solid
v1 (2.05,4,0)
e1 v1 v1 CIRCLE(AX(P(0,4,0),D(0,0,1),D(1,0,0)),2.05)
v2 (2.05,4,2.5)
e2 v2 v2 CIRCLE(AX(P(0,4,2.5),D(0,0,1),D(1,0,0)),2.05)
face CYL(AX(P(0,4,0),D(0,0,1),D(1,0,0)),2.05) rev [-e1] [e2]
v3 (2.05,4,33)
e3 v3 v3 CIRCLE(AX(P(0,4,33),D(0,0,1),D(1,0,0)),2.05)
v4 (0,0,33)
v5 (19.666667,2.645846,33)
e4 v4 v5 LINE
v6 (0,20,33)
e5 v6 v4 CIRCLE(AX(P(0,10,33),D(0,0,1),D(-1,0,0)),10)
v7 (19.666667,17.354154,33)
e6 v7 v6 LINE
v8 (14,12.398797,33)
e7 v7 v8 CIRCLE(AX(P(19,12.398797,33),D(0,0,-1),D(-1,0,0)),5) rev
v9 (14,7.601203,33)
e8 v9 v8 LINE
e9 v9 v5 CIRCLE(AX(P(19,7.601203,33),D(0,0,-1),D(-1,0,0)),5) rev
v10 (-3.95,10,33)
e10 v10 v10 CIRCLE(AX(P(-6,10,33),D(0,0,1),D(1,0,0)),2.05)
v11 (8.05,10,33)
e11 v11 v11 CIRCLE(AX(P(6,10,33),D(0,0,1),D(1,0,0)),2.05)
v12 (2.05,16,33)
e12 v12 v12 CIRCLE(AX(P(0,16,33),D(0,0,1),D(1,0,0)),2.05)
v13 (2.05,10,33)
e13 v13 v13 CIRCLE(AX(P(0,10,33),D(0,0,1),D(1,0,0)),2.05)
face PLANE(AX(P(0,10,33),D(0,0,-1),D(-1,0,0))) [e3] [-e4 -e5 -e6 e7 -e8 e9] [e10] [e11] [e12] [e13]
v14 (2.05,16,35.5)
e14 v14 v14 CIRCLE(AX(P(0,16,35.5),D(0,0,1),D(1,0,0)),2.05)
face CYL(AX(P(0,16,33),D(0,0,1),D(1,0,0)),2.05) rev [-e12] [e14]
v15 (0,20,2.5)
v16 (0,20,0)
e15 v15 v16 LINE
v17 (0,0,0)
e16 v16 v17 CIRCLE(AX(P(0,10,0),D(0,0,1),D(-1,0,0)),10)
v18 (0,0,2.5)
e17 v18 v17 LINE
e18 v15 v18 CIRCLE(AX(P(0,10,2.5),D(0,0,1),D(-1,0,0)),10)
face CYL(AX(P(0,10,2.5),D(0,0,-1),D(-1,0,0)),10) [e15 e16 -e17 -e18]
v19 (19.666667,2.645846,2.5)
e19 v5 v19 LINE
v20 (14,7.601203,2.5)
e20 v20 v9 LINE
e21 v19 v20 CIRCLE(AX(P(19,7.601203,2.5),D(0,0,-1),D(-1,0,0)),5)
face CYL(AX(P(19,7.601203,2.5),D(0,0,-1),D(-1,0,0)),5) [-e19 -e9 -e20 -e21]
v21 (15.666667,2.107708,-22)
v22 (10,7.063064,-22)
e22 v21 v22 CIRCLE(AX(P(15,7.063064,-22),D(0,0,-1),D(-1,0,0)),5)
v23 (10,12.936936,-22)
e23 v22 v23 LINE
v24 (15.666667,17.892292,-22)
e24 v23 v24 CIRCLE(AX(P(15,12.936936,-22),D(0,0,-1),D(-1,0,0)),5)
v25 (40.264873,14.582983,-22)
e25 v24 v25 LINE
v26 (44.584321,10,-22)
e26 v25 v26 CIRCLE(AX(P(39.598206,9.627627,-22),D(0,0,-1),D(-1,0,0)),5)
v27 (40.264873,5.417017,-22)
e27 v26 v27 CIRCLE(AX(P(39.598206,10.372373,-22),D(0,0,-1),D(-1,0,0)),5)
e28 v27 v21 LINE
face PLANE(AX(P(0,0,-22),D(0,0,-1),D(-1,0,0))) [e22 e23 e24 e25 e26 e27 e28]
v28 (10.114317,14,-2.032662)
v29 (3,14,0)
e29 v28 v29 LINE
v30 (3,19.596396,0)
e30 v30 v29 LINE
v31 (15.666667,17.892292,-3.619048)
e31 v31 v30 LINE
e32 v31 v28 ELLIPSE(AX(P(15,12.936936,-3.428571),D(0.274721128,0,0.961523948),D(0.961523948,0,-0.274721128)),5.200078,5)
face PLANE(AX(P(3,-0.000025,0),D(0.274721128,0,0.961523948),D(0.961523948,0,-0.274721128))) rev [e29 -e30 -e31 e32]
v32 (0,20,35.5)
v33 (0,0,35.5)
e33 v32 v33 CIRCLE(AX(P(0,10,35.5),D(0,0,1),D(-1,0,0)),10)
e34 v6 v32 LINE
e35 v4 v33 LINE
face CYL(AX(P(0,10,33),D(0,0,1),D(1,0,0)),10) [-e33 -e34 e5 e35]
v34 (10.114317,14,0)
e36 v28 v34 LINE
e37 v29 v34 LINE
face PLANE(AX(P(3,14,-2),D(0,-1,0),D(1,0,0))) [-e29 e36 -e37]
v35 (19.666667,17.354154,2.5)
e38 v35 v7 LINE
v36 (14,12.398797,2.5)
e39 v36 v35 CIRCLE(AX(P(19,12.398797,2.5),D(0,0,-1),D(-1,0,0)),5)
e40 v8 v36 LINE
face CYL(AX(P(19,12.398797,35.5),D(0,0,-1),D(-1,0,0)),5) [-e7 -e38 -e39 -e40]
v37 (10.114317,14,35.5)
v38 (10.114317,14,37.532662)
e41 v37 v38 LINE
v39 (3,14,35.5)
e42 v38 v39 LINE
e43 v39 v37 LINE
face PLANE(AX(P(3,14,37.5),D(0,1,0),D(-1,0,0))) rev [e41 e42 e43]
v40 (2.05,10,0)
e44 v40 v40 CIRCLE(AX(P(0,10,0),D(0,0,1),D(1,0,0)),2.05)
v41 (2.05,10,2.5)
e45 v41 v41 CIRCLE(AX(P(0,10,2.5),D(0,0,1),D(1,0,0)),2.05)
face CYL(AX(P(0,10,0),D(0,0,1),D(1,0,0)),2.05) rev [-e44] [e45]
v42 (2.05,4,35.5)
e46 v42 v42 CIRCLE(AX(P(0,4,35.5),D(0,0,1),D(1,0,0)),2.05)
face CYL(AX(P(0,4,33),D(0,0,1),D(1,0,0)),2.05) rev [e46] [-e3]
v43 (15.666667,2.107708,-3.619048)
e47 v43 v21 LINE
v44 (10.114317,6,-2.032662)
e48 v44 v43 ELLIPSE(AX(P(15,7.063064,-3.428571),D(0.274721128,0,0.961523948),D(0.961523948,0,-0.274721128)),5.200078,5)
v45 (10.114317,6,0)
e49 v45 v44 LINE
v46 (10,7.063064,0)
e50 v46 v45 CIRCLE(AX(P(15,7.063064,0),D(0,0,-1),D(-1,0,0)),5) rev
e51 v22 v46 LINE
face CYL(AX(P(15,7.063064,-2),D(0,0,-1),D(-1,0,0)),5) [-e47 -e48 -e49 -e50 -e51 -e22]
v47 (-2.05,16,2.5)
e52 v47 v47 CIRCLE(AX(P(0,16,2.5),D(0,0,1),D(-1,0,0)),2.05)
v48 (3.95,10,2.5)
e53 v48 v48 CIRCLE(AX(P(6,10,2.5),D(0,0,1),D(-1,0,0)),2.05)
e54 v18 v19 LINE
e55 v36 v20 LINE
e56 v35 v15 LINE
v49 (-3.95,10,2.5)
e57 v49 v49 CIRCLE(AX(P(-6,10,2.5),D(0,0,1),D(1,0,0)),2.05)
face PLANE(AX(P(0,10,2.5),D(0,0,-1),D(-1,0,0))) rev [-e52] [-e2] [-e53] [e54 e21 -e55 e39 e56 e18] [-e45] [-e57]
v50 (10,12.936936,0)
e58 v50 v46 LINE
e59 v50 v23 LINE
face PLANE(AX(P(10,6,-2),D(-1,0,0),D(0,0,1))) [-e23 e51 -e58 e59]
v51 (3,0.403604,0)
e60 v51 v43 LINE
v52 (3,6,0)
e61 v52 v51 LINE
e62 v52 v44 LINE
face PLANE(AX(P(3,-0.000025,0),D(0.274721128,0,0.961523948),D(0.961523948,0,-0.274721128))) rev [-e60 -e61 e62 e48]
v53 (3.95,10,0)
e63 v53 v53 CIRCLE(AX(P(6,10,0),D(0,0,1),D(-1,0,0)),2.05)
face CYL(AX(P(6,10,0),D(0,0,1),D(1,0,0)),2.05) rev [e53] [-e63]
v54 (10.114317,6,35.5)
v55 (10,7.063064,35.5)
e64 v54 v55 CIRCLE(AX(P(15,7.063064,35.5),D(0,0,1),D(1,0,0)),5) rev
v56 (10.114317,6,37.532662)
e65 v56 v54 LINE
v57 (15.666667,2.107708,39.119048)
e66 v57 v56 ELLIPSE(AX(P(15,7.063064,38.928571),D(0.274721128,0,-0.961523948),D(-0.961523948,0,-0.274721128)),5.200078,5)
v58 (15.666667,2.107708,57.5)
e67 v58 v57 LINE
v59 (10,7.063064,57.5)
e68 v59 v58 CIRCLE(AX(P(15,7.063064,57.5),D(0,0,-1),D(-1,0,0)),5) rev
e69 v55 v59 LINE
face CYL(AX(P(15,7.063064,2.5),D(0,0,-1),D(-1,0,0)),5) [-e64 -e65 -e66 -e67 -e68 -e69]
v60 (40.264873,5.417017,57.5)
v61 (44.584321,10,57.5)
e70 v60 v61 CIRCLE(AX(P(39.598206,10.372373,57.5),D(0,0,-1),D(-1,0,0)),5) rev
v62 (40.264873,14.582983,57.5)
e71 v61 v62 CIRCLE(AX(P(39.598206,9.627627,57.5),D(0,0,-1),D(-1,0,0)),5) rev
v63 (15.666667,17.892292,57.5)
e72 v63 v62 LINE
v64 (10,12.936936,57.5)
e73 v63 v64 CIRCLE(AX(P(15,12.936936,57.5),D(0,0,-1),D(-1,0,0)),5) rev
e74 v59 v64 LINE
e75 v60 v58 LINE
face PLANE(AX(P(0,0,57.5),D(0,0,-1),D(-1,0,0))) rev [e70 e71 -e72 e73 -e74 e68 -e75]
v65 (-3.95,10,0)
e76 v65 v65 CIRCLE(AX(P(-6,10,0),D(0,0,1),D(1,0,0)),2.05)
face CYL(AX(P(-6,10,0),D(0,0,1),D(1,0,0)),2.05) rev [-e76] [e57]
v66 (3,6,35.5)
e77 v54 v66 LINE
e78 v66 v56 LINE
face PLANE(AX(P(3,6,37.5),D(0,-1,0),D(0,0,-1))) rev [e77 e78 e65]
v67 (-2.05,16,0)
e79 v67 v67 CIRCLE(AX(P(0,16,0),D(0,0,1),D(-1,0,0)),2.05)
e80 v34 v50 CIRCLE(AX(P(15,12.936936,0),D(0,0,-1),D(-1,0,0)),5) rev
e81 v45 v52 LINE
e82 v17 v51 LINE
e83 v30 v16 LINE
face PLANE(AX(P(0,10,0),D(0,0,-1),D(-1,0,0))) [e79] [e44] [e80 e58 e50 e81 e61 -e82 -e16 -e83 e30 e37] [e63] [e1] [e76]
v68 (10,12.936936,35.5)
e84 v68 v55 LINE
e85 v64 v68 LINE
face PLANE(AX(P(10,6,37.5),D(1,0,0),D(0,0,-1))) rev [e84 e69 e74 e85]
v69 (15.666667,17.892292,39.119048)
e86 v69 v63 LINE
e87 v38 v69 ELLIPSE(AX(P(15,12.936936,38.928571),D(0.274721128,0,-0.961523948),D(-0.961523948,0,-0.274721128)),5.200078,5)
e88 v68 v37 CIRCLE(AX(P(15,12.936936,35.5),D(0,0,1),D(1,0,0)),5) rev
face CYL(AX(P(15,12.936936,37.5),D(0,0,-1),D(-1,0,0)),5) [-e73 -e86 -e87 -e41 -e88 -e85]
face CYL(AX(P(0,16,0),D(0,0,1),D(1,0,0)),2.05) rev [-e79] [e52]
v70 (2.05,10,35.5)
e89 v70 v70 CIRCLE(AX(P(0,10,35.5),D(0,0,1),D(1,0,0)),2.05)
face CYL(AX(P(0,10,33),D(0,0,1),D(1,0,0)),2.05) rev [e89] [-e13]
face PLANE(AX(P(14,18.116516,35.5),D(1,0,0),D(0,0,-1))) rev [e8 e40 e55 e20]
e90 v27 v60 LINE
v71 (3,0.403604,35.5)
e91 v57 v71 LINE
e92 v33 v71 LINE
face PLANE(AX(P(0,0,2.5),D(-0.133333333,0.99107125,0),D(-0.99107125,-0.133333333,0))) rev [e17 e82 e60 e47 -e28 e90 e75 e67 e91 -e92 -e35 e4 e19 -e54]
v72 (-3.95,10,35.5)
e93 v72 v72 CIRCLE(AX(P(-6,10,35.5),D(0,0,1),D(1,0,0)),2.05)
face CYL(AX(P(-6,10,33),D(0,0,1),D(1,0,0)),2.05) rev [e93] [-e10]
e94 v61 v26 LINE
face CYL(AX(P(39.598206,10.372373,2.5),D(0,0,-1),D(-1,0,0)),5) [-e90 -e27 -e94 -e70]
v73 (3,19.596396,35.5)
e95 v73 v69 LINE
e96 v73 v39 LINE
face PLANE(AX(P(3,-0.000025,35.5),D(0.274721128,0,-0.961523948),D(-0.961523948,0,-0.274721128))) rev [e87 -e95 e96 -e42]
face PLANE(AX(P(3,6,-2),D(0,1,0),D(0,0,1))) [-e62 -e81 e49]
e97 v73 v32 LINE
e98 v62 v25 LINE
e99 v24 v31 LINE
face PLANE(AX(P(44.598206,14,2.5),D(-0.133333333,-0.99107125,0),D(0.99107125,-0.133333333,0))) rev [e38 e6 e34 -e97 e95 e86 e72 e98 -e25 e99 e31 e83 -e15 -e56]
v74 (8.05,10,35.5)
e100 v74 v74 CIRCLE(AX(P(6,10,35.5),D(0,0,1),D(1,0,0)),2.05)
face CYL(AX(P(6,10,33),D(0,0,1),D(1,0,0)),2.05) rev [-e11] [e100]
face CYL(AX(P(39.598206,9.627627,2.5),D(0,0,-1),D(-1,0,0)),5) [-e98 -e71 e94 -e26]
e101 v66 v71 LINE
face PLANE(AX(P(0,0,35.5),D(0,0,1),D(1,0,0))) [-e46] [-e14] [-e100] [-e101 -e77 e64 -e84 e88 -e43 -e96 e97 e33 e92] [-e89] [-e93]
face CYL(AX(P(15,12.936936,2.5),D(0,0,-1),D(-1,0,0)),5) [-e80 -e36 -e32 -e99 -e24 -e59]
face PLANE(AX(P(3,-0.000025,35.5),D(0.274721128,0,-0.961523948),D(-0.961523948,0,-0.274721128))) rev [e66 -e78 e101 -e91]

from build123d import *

# Parameters (mm, degrees)
BOSS_EXTRU_1_DEPTH           = 2.5
ESQUISSE2_R                  = 2.05
ENL_V_MAT_EXTRU_1_DEPTH      = 49.94129136
BOSS_EXTRU_2_DEPTH           = 33
ESQUISSE6_R                  = 2.05
BOSS_EXTRU_3_DEPTH           = 2.5
BOSS_EXTRU_4_DEPTH           = 2
BOSS_EXTRU_5_START           = -35.5
BOSS_EXTRU_5_DEPTH           = 2
ENL_V_MAT_EXTRU_5_DEPTH      = 62.605600395
ENL_V_MAT_EXTRU_5_DEPTH_BACK = 62.605600395
BOSS_EXTRU_6_DEPTH           = 20
BOSS_EXTRU_7_START           = -39.5
BOSS_EXTRU_7_DEPTH           = 20
CONG_1_R                     = 5


with BuildPart() as part:
    # Esquisse1 → Boss.-Extru.1 (new body)
    with BuildSketch(Plane.XY):
        with BuildLine():
            Line((0, 0), (44.598206242, 6))
            Line((44.598206242, 6), (44.598206242, 14))
            Line((44.598206242, 14), (0, 20))
            ThreePointArc((0, 20), (-10, 10), (0, 0))
        make_face()
    extrude(amount=BOSS_EXTRU_1_DEPTH)

    # Esquisse2 → Enlèv. mat.-Extru.1 (cut, through all)
    with BuildSketch(Plane.XY.offset(2.5)):
        with Locations((-6, 10)):
            Circle(ESQUISSE2_R)
        with Locations((0, 4)):
            Circle(ESQUISSE2_R)
        with Locations(Location((0, 16, 0), (0, 0, 180))):
            Circle(ESQUISSE2_R)
        with Locations(Location((6, 10, 0), (0, 0, 180))):
            Circle(ESQUISSE2_R)
        with Locations((0, 10)):
            Circle(ESQUISSE2_R)
    extrude(amount=-ENL_V_MAT_EXTRU_1_DEPTH, mode=Mode.SUBTRACT)

    # Esquisse5 → Boss.-Extru.2 (add)
    with BuildSketch(Plane.XY.offset(2.5)):
        Polygon((44.598206242, 14), (14, 18.116516177), (14, 1.883483823), (44.598206242, 6), align=None)
    extrude(amount=BOSS_EXTRU_2_DEPTH)

    # Esquisse6 → Boss.-Extru.3 (add)
    with BuildSketch(Plane.XY.offset(35.5)):
        with BuildLine():
            Line((44.598206242, 14), (0, 20))
            ThreePointArc((0, 20), (-10, 10), (0, 0))
            Line((0, 0), (44.598206242, 6))
            Line((44.598206242, 6), (44.598206242, 14))
        make_face()
        with Locations(Location((0, 16, 0), (0, 0, 180))):
            Circle(ESQUISSE6_R, mode=Mode.SUBTRACT)
        with Locations((-6, 10)):
            Circle(ESQUISSE6_R, mode=Mode.SUBTRACT)
        with Locations(Location((6, 10, 0), (0, 0, 180))):
            Circle(ESQUISSE6_R, mode=Mode.SUBTRACT)
        with Locations((0, 4)):
            Circle(ESQUISSE6_R, mode=Mode.SUBTRACT)
        with Locations((0, 10)):
            Circle(ESQUISSE6_R, mode=Mode.SUBTRACT)
    extrude(amount=-BOSS_EXTRU_3_DEPTH)

    # Esquisse9 → Boss.-Extru.4 (add)
    with BuildSketch(Plane.XY.offset(35.5)):
        Polygon((44.598206242, 14), (3, 19.596396324), (3, 14), (10, 14), (10, 6), (3, 6), (3, 0.403603676), (44.598206242, 6), align=None)
    extrude(amount=BOSS_EXTRU_4_DEPTH)

    # Esquisse9<2> → Boss.-Extru.5 (add)
    with BuildSketch(Plane.XY.offset(35.5).offset(BOSS_EXTRU_5_START)):
        Polygon((44.598206242, 14), (3, 19.596396324), (3, 14), (10, 14), (10, 6), (3, 6), (3, 0.403603676), (44.598206242, 6), align=None)
    extrude(amount=-BOSS_EXTRU_5_DEPTH)

    # Esquisse11 → Enlèv. mat.-Extru.5 (cut, two sides: drawn at the far end of the back side and taken through both)
    with BuildSketch(Plane(origin=(0, 0, 0), x_dir=(1, 0, 0), z_dir=(0, 1, 0)).offset(-ENL_V_MAT_EXTRU_5_DEPTH_BACK)):
        Polygon((3, -35.5), (10, -37.5), (3, -37.5), align=None)
        Polygon((3, 2), (3, 0), (10, 2), align=None)
    extrude(amount=ENL_V_MAT_EXTRU_5_DEPTH + ENL_V_MAT_EXTRU_5_DEPTH_BACK, mode=Mode.SUBTRACT)

    # Esquisse12 → Boss.-Extru.6 (add)
    with BuildSketch(Plane(origin=(0, 0, -2), x_dir=(-1, 0, 0), z_dir=(0, 0, -1))):
        Polygon((-44.598206242, 14), (-44.598206242, 6), (-10, 1.345345588), (-10, 18.654654412), align=None)
    extrude(amount=BOSS_EXTRU_6_DEPTH)

    # Esquisse12<2> → Boss.-Extru.7 (add)
    with BuildSketch(Plane(origin=(0, 0, -2), x_dir=(-1, 0, 0), z_dir=(0, 0, -1)).offset(BOSS_EXTRU_7_START)):
        Polygon((-44.598206242, 14), (-44.598206242, 6), (-10, 1.345345588), (-10, 18.654654412), align=None)
    extrude(amount=-BOSS_EXTRU_7_DEPTH)

    # Congé1
    # the kernel refuses this fillet: 5 mm, written as the material it takes off along each edge
    with BuildSketch(Plane(origin=(10, 18.654654412, 23.205703128), x_dir=(0.9910712498212338, -0.1333333333333327, 0), z_dir=(0, 0, 1))) as cong_1_piece_1_section:
        with BuildLine():
            CenterArc((CONG_1_R * 1.14354374979, -CONG_1_R), CONG_1_R, 90, 97.662255661)
            Line((CONG_1_R * 0.152472499972, -CONG_1_R * 1.13333333333), (0, 0))
            Line((0, 0), (CONG_1_R * 1.14354374979, 0))
        make_face()
    cong_1_piece_1 = extrude(amount=48.588593745, mode=Mode.PRIVATE)
    cong_1_piece_1 = split(cong_1_piece_1, bisect_by=Plane(origin=(14.41713272, 17.97630815, 33), z_dir=(0, 0, -1)), keep=Keep.TOP, mode=Mode.PRIVATE)
    add(cong_1_piece_1, mode=Mode.SUBTRACT)
    with BuildSketch(Plane(origin=(10, 18.654654412, 23.205703128), x_dir=(0.9910712498212338, -0.1333333333333327, 0), z_dir=(0, 0, 1))) as cong_1_piece_2_section:
        with BuildLine():
            CenterArc((CONG_1_R * 1.14354374979, -CONG_1_R), CONG_1_R, 90, 97.662255661)
            Line((CONG_1_R * 0.152472499972, -CONG_1_R * 1.13333333333), (0, 0))
            Line((0, 0), (CONG_1_R * 1.14354374979, 0))
        make_face()
    cong_1_piece_2 = extrude(amount=48.588593745, mode=Mode.PRIVATE)
    cong_1_piece_2 = split(cong_1_piece_2, bisect_by=Plane(origin=(16.890425436, 17.976343962, 39.468692982), z_dir=(-0.27472112789737807, 0, 0.9615239476408232)), keep=Keep.TOP, mode=Mode.PRIVATE)
    add(cong_1_piece_2, mode=Mode.SUBTRACT)
    with BuildSketch(Plane(origin=(10, 18.654654412, 23.205703128), x_dir=(0.9910712498212338, -0.1333333333333327, 0), z_dir=(0, 0, 1))) as cong_1_piece_3_section:
        with BuildLine():
            CenterArc((CONG_1_R * 1.14354374979, -CONG_1_R), CONG_1_R, 90, 97.662255661)
            Line((CONG_1_R * 0.152472499972, -CONG_1_R * 1.13333333333), (0, 0))
            Line((0, 0), (CONG_1_R * 1.14354374979, 0))
        make_face()
    cong_1_piece_3 = extrude(amount=48.588593745, mode=Mode.PRIVATE)
    cong_1_piece_3 = split(cong_1_piece_3, bisect_by=Plane(origin=(10.034324998, 14, 36.504903571), z_dir=(0, -1, 0)), keep=Keep.TOP, mode=Mode.PRIVATE)
    cong_1_piece_3 = split(cong_1_piece_3, bisect_by=Plane(origin=(10.034324998, 13.735276956, 35.5), z_dir=(0, 0, 1)), keep=Keep.TOP, mode=Mode.PRIVATE)
    add(cong_1_piece_3, mode=Mode.SUBTRACT)
    with BuildSketch(Plane(origin=(10, 1.345345588, 23.205703128), x_dir=(0.9910712498212336, 0.13333333333333347, 0), z_dir=(0, 0, 1))) as cong_1_piece_4_section:
        with BuildLine():
            CenterArc((CONG_1_R * 1.14354374979, CONG_1_R), CONG_1_R, 172.337744339, 97.662255661)
            Line((CONG_1_R * 0.152472499972, CONG_1_R * 1.13333333333), (0, 0))
            Line((0, 0), (CONG_1_R * 1.14354374979, 0))
        make_face()
    cong_1_piece_4 = extrude(amount=48.588593745, mode=Mode.PRIVATE)
    cong_1_piece_4 = split(cong_1_piece_4, bisect_by=Plane(origin=(14.41713272, 2.02369185, 33), z_dir=(0, 0, -1)), keep=Keep.TOP, mode=Mode.PRIVATE)
    add(cong_1_piece_4, mode=Mode.SUBTRACT)
    with BuildSketch(Plane(origin=(10, 1.345345588, 23.205703128), x_dir=(0.9910712498212336, 0.13333333333333347, 0), z_dir=(0, 0, 1))) as cong_1_piece_5_section:
        with BuildLine():
            CenterArc((CONG_1_R * 1.14354374979, CONG_1_R), CONG_1_R, 172.337744339, 97.662255661)
            Line((CONG_1_R * 0.152472499972, CONG_1_R * 1.13333333333), (0, 0))
            Line((0, 0), (CONG_1_R * 1.14354374979, 0))
        make_face()
    cong_1_piece_5 = extrude(amount=48.588593745, mode=Mode.PRIVATE)
    cong_1_piece_5 = split(cong_1_piece_5, bisect_by=Plane(origin=(16.890425436, 2.023656038, 39.468692982), z_dir=(-0.27472112789737807, 0, 0.9615239476408232)), keep=Keep.TOP, mode=Mode.PRIVATE)
    add(cong_1_piece_5, mode=Mode.SUBTRACT)
    with BuildSketch(Plane(origin=(10, 1.345345588, 23.205703128), x_dir=(0.9910712498212336, 0.13333333333333347, 0), z_dir=(0, 0, 1))) as cong_1_piece_6_section:
        with BuildLine():
            CenterArc((CONG_1_R * 1.14354374979, CONG_1_R), CONG_1_R, 172.337744339, 97.662255661)
            Line((CONG_1_R * 0.152472499972, CONG_1_R * 1.13333333333), (0, 0))
            Line((0, 0), (CONG_1_R * 1.14354374979, 0))
        make_face()
    cong_1_piece_6 = extrude(amount=48.588593745, mode=Mode.PRIVATE)
    cong_1_piece_6 = split(cong_1_piece_6, bisect_by=Plane(origin=(10.034324998, 6, 36.504903571), z_dir=(0, 1, 0)), keep=Keep.TOP, mode=Mode.PRIVATE)
    cong_1_piece_6 = split(cong_1_piece_6, bisect_by=Plane(origin=(10.034324998, 6.264723044, 35.5), z_dir=(0, 0, 1)), keep=Keep.TOP, mode=Mode.PRIVATE)
    add(cong_1_piece_6, mode=Mode.SUBTRACT)
    with BuildSketch(Plane(origin=(10, 18.654654412, 12.294296872), x_dir=(0, -1, 0), z_dir=(0, 0, -1))) as cong_1_piece_7_section:
        with BuildLine():
            CenterArc((CONG_1_R * 1.14354374979, -CONG_1_R), CONG_1_R, 90, 97.662255661)
            Line((CONG_1_R * 0.152472499972, -CONG_1_R * 1.13333333333), (0, 0))
            Line((0, 0), (CONG_1_R * 1.14354374979, 0))
        make_face()
    cong_1_piece_7 = extrude(amount=48.588593745, mode=Mode.PRIVATE)
    cong_1_piece_7 = split(cong_1_piece_7, bisect_by=Plane(origin=(14.41713272, 17.97630815, 2.5), z_dir=(0, 0, 1)), keep=Keep.TOP, mode=Mode.PRIVATE)
    add(cong_1_piece_7, mode=Mode.SUBTRACT)
    with BuildSketch(Plane(origin=(10, 18.654654412, 12.294296872), x_dir=(0, -1, 0), z_dir=(0, 0, -1))) as cong_1_piece_8_section:
        with BuildLine():
            CenterArc((CONG_1_R * 1.14354374979, -CONG_1_R), CONG_1_R, 90, 97.662255661)
            Line((CONG_1_R * 0.152472499972, -CONG_1_R * 1.13333333333), (0, 0))
            Line((0, 0), (CONG_1_R * 1.14354374979, 0))
        make_face()
    cong_1_piece_8 = extrude(amount=48.588593745, mode=Mode.PRIVATE)
    cong_1_piece_8 = split(cong_1_piece_8, bisect_by=Plane(origin=(10.034324998, 14, -1.004903571), z_dir=(0, -1, 0)), keep=Keep.TOP, mode=Mode.PRIVATE)
    cong_1_piece_8 = split(cong_1_piece_8, bisect_by=Plane(origin=(10.034324998, 13.735276956, 0), z_dir=(0, 0, -1)), keep=Keep.TOP, mode=Mode.PRIVATE)
    add(cong_1_piece_8, mode=Mode.SUBTRACT)
    with BuildSketch(Plane(origin=(10, 18.654654412, 12.294296872), x_dir=(0, -1, 0), z_dir=(0, 0, -1))) as cong_1_piece_9_section:
        with BuildLine():
            CenterArc((CONG_1_R * 1.14354374979, -CONG_1_R), CONG_1_R, 90, 97.662255661)
            Line((CONG_1_R * 0.152472499972, -CONG_1_R * 1.13333333333), (0, 0))
            Line((0, 0), (CONG_1_R * 1.14354374979, 0))
        make_face()
    cong_1_piece_9 = extrude(amount=48.588593745, mode=Mode.PRIVATE)
    cong_1_piece_9 = split(cong_1_piece_9, bisect_by=Plane(origin=(13.812288086, 17.172261855, -3.089225167), z_dir=(-0.27472112789737835, 0, -0.9615239476408232)), keep=Keep.TOP, mode=Mode.PRIVATE)
    add(cong_1_piece_9, mode=Mode.SUBTRACT)
    with BuildSketch(Plane(origin=(10, 1.345345588, 12.294296872), x_dir=(0.9910712498212336, 0.13333333333333347, 0), z_dir=(0, 0, -1))) as cong_1_piece_10_section:
        with BuildLine():
            CenterArc((CONG_1_R * 1.14354374979, -CONG_1_R), CONG_1_R, 90, 97.662255661)
            Line((CONG_1_R * 0.152472499972, -CONG_1_R * 1.13333333333), (0, 0))
            Line((0, 0), (CONG_1_R * 1.14354374979, 0))
        make_face()
    cong_1_piece_10 = extrude(amount=48.588593745, mode=Mode.PRIVATE)
    cong_1_piece_10 = split(cong_1_piece_10, bisect_by=Plane(origin=(14.41713272, 2.02369185, 2.5), z_dir=(0, 0, 1)), keep=Keep.TOP, mode=Mode.PRIVATE)
    add(cong_1_piece_10, mode=Mode.SUBTRACT)
    with BuildSketch(Plane(origin=(10, 1.345345588, 12.294296872), x_dir=(0.9910712498212336, 0.13333333333333347, 0), z_dir=(0, 0, -1))) as cong_1_piece_11_section:
        with BuildLine():
            CenterArc((CONG_1_R * 1.14354374979, -CONG_1_R), CONG_1_R, 90, 97.662255661)
            Line((CONG_1_R * 0.152472499972, -CONG_1_R * 1.13333333333), (0, 0))
            Line((0, 0), (CONG_1_R * 1.14354374979, 0))
        make_face()
    cong_1_piece_11 = extrude(amount=48.588593745, mode=Mode.PRIVATE)
    cong_1_piece_11 = split(cong_1_piece_11, bisect_by=Plane(origin=(16.890425436, 2.023656038, -3.968692982), z_dir=(-0.27472112789737835, 0, -0.9615239476408232)), keep=Keep.TOP, mode=Mode.PRIVATE)
    add(cong_1_piece_11, mode=Mode.SUBTRACT)
    with BuildSketch(Plane(origin=(10, 1.345345588, 12.294296872), x_dir=(0.9910712498212336, 0.13333333333333347, 0), z_dir=(0, 0, -1))) as cong_1_piece_12_section:
        with BuildLine():
            CenterArc((CONG_1_R * 1.14354374979, -CONG_1_R), CONG_1_R, 90, 97.662255661)
            Line((CONG_1_R * 0.152472499972, -CONG_1_R * 1.13333333333), (0, 0))
            Line((0, 0), (CONG_1_R * 1.14354374979, 0))
        make_face()
    cong_1_piece_12 = extrude(amount=48.588593745, mode=Mode.PRIVATE)
    cong_1_piece_12 = split(cong_1_piece_12, bisect_by=Plane(origin=(10.034324998, 6, -1.004903571), z_dir=(0, 1, 0)), keep=Keep.TOP, mode=Mode.PRIVATE)
    cong_1_piece_12 = split(cong_1_piece_12, bisect_by=Plane(origin=(10.034324998, 6.264723044, 0), z_dir=(0, 0, -1)), keep=Keep.TOP, mode=Mode.PRIVATE)
    add(cong_1_piece_12, mode=Mode.SUBTRACT)
    with BuildSketch(Plane(origin=(14, 18.116516177, 2.5), x_dir=(0.9910712498212336, -0.13333333333333325, 0), z_dir=(0, 0, 1))) as cong_1_piece_13:
        with BuildLine():
            CenterArc((CONG_1_R * 1.14354374979, -CONG_1_R), CONG_1_R, 90, 97.662255661)
            Line((CONG_1_R * 0.152472499972, -CONG_1_R * 1.13333333333), (0, 0))
            Line((0, 0), (CONG_1_R * 1.14354374979, 0))
        make_face()
    extrude(amount=30.5, mode=Mode.SUBTRACT)
    with BuildSketch(Plane(origin=(14, 1.883483823, 2.5), x_dir=(0.9910712498212336, 0.13333333333333353, 0), z_dir=(0, 0, 1))) as cong_1_piece_14:
        with BuildLine():
            CenterArc((CONG_1_R * 1.14354374979, CONG_1_R), CONG_1_R, 172.337744339, 97.662255661)
            Line((CONG_1_R * 0.152472499972, CONG_1_R * 1.13333333333), (0, 0))
            Line((0, 0), (CONG_1_R * 1.14354374979, 0))
        make_face()
    extrude(amount=30.5, mode=Mode.SUBTRACT)
    with BuildSketch(Plane(origin=(44.598206242, 14, -32.930932902), x_dir=(-0.9910712498212338, 0.13333333333333305, 0), z_dir=(0, 0, 1))) as cong_1_piece_15:
        with BuildLine():
            CenterArc((CONG_1_R * 0.874474632195, CONG_1_R), CONG_1_R, 187.662255661, 82.337744339)
            Line((-CONG_1_R * 0.116596617626, CONG_1_R * 0.866666666667), (0, 0))
            Line((0, 0), (CONG_1_R * 0.874474632195, 0))
        make_face()
    extrude(amount=101.361865805, mode=Mode.SUBTRACT)
    with BuildSketch(Plane(origin=(44.598206242, 6, -32.930932902), x_dir=(-0.9910712498212337, -0.1333333333333333, 0), z_dir=(0, 0, 1))) as cong_1_piece_16:
        with BuildLine():
            CenterArc((CONG_1_R * 0.874474632195, -CONG_1_R), CONG_1_R, 90, 82.337744339)
            Line((-CONG_1_R * 0.116596617626, -CONG_1_R * 0.866666666667), (0, 0))
            Line((0, 0), (CONG_1_R * 0.874474632195, 0))
        make_face()
    extrude(amount=101.361865805, mode=Mode.SUBTRACT)


solid = part.part
